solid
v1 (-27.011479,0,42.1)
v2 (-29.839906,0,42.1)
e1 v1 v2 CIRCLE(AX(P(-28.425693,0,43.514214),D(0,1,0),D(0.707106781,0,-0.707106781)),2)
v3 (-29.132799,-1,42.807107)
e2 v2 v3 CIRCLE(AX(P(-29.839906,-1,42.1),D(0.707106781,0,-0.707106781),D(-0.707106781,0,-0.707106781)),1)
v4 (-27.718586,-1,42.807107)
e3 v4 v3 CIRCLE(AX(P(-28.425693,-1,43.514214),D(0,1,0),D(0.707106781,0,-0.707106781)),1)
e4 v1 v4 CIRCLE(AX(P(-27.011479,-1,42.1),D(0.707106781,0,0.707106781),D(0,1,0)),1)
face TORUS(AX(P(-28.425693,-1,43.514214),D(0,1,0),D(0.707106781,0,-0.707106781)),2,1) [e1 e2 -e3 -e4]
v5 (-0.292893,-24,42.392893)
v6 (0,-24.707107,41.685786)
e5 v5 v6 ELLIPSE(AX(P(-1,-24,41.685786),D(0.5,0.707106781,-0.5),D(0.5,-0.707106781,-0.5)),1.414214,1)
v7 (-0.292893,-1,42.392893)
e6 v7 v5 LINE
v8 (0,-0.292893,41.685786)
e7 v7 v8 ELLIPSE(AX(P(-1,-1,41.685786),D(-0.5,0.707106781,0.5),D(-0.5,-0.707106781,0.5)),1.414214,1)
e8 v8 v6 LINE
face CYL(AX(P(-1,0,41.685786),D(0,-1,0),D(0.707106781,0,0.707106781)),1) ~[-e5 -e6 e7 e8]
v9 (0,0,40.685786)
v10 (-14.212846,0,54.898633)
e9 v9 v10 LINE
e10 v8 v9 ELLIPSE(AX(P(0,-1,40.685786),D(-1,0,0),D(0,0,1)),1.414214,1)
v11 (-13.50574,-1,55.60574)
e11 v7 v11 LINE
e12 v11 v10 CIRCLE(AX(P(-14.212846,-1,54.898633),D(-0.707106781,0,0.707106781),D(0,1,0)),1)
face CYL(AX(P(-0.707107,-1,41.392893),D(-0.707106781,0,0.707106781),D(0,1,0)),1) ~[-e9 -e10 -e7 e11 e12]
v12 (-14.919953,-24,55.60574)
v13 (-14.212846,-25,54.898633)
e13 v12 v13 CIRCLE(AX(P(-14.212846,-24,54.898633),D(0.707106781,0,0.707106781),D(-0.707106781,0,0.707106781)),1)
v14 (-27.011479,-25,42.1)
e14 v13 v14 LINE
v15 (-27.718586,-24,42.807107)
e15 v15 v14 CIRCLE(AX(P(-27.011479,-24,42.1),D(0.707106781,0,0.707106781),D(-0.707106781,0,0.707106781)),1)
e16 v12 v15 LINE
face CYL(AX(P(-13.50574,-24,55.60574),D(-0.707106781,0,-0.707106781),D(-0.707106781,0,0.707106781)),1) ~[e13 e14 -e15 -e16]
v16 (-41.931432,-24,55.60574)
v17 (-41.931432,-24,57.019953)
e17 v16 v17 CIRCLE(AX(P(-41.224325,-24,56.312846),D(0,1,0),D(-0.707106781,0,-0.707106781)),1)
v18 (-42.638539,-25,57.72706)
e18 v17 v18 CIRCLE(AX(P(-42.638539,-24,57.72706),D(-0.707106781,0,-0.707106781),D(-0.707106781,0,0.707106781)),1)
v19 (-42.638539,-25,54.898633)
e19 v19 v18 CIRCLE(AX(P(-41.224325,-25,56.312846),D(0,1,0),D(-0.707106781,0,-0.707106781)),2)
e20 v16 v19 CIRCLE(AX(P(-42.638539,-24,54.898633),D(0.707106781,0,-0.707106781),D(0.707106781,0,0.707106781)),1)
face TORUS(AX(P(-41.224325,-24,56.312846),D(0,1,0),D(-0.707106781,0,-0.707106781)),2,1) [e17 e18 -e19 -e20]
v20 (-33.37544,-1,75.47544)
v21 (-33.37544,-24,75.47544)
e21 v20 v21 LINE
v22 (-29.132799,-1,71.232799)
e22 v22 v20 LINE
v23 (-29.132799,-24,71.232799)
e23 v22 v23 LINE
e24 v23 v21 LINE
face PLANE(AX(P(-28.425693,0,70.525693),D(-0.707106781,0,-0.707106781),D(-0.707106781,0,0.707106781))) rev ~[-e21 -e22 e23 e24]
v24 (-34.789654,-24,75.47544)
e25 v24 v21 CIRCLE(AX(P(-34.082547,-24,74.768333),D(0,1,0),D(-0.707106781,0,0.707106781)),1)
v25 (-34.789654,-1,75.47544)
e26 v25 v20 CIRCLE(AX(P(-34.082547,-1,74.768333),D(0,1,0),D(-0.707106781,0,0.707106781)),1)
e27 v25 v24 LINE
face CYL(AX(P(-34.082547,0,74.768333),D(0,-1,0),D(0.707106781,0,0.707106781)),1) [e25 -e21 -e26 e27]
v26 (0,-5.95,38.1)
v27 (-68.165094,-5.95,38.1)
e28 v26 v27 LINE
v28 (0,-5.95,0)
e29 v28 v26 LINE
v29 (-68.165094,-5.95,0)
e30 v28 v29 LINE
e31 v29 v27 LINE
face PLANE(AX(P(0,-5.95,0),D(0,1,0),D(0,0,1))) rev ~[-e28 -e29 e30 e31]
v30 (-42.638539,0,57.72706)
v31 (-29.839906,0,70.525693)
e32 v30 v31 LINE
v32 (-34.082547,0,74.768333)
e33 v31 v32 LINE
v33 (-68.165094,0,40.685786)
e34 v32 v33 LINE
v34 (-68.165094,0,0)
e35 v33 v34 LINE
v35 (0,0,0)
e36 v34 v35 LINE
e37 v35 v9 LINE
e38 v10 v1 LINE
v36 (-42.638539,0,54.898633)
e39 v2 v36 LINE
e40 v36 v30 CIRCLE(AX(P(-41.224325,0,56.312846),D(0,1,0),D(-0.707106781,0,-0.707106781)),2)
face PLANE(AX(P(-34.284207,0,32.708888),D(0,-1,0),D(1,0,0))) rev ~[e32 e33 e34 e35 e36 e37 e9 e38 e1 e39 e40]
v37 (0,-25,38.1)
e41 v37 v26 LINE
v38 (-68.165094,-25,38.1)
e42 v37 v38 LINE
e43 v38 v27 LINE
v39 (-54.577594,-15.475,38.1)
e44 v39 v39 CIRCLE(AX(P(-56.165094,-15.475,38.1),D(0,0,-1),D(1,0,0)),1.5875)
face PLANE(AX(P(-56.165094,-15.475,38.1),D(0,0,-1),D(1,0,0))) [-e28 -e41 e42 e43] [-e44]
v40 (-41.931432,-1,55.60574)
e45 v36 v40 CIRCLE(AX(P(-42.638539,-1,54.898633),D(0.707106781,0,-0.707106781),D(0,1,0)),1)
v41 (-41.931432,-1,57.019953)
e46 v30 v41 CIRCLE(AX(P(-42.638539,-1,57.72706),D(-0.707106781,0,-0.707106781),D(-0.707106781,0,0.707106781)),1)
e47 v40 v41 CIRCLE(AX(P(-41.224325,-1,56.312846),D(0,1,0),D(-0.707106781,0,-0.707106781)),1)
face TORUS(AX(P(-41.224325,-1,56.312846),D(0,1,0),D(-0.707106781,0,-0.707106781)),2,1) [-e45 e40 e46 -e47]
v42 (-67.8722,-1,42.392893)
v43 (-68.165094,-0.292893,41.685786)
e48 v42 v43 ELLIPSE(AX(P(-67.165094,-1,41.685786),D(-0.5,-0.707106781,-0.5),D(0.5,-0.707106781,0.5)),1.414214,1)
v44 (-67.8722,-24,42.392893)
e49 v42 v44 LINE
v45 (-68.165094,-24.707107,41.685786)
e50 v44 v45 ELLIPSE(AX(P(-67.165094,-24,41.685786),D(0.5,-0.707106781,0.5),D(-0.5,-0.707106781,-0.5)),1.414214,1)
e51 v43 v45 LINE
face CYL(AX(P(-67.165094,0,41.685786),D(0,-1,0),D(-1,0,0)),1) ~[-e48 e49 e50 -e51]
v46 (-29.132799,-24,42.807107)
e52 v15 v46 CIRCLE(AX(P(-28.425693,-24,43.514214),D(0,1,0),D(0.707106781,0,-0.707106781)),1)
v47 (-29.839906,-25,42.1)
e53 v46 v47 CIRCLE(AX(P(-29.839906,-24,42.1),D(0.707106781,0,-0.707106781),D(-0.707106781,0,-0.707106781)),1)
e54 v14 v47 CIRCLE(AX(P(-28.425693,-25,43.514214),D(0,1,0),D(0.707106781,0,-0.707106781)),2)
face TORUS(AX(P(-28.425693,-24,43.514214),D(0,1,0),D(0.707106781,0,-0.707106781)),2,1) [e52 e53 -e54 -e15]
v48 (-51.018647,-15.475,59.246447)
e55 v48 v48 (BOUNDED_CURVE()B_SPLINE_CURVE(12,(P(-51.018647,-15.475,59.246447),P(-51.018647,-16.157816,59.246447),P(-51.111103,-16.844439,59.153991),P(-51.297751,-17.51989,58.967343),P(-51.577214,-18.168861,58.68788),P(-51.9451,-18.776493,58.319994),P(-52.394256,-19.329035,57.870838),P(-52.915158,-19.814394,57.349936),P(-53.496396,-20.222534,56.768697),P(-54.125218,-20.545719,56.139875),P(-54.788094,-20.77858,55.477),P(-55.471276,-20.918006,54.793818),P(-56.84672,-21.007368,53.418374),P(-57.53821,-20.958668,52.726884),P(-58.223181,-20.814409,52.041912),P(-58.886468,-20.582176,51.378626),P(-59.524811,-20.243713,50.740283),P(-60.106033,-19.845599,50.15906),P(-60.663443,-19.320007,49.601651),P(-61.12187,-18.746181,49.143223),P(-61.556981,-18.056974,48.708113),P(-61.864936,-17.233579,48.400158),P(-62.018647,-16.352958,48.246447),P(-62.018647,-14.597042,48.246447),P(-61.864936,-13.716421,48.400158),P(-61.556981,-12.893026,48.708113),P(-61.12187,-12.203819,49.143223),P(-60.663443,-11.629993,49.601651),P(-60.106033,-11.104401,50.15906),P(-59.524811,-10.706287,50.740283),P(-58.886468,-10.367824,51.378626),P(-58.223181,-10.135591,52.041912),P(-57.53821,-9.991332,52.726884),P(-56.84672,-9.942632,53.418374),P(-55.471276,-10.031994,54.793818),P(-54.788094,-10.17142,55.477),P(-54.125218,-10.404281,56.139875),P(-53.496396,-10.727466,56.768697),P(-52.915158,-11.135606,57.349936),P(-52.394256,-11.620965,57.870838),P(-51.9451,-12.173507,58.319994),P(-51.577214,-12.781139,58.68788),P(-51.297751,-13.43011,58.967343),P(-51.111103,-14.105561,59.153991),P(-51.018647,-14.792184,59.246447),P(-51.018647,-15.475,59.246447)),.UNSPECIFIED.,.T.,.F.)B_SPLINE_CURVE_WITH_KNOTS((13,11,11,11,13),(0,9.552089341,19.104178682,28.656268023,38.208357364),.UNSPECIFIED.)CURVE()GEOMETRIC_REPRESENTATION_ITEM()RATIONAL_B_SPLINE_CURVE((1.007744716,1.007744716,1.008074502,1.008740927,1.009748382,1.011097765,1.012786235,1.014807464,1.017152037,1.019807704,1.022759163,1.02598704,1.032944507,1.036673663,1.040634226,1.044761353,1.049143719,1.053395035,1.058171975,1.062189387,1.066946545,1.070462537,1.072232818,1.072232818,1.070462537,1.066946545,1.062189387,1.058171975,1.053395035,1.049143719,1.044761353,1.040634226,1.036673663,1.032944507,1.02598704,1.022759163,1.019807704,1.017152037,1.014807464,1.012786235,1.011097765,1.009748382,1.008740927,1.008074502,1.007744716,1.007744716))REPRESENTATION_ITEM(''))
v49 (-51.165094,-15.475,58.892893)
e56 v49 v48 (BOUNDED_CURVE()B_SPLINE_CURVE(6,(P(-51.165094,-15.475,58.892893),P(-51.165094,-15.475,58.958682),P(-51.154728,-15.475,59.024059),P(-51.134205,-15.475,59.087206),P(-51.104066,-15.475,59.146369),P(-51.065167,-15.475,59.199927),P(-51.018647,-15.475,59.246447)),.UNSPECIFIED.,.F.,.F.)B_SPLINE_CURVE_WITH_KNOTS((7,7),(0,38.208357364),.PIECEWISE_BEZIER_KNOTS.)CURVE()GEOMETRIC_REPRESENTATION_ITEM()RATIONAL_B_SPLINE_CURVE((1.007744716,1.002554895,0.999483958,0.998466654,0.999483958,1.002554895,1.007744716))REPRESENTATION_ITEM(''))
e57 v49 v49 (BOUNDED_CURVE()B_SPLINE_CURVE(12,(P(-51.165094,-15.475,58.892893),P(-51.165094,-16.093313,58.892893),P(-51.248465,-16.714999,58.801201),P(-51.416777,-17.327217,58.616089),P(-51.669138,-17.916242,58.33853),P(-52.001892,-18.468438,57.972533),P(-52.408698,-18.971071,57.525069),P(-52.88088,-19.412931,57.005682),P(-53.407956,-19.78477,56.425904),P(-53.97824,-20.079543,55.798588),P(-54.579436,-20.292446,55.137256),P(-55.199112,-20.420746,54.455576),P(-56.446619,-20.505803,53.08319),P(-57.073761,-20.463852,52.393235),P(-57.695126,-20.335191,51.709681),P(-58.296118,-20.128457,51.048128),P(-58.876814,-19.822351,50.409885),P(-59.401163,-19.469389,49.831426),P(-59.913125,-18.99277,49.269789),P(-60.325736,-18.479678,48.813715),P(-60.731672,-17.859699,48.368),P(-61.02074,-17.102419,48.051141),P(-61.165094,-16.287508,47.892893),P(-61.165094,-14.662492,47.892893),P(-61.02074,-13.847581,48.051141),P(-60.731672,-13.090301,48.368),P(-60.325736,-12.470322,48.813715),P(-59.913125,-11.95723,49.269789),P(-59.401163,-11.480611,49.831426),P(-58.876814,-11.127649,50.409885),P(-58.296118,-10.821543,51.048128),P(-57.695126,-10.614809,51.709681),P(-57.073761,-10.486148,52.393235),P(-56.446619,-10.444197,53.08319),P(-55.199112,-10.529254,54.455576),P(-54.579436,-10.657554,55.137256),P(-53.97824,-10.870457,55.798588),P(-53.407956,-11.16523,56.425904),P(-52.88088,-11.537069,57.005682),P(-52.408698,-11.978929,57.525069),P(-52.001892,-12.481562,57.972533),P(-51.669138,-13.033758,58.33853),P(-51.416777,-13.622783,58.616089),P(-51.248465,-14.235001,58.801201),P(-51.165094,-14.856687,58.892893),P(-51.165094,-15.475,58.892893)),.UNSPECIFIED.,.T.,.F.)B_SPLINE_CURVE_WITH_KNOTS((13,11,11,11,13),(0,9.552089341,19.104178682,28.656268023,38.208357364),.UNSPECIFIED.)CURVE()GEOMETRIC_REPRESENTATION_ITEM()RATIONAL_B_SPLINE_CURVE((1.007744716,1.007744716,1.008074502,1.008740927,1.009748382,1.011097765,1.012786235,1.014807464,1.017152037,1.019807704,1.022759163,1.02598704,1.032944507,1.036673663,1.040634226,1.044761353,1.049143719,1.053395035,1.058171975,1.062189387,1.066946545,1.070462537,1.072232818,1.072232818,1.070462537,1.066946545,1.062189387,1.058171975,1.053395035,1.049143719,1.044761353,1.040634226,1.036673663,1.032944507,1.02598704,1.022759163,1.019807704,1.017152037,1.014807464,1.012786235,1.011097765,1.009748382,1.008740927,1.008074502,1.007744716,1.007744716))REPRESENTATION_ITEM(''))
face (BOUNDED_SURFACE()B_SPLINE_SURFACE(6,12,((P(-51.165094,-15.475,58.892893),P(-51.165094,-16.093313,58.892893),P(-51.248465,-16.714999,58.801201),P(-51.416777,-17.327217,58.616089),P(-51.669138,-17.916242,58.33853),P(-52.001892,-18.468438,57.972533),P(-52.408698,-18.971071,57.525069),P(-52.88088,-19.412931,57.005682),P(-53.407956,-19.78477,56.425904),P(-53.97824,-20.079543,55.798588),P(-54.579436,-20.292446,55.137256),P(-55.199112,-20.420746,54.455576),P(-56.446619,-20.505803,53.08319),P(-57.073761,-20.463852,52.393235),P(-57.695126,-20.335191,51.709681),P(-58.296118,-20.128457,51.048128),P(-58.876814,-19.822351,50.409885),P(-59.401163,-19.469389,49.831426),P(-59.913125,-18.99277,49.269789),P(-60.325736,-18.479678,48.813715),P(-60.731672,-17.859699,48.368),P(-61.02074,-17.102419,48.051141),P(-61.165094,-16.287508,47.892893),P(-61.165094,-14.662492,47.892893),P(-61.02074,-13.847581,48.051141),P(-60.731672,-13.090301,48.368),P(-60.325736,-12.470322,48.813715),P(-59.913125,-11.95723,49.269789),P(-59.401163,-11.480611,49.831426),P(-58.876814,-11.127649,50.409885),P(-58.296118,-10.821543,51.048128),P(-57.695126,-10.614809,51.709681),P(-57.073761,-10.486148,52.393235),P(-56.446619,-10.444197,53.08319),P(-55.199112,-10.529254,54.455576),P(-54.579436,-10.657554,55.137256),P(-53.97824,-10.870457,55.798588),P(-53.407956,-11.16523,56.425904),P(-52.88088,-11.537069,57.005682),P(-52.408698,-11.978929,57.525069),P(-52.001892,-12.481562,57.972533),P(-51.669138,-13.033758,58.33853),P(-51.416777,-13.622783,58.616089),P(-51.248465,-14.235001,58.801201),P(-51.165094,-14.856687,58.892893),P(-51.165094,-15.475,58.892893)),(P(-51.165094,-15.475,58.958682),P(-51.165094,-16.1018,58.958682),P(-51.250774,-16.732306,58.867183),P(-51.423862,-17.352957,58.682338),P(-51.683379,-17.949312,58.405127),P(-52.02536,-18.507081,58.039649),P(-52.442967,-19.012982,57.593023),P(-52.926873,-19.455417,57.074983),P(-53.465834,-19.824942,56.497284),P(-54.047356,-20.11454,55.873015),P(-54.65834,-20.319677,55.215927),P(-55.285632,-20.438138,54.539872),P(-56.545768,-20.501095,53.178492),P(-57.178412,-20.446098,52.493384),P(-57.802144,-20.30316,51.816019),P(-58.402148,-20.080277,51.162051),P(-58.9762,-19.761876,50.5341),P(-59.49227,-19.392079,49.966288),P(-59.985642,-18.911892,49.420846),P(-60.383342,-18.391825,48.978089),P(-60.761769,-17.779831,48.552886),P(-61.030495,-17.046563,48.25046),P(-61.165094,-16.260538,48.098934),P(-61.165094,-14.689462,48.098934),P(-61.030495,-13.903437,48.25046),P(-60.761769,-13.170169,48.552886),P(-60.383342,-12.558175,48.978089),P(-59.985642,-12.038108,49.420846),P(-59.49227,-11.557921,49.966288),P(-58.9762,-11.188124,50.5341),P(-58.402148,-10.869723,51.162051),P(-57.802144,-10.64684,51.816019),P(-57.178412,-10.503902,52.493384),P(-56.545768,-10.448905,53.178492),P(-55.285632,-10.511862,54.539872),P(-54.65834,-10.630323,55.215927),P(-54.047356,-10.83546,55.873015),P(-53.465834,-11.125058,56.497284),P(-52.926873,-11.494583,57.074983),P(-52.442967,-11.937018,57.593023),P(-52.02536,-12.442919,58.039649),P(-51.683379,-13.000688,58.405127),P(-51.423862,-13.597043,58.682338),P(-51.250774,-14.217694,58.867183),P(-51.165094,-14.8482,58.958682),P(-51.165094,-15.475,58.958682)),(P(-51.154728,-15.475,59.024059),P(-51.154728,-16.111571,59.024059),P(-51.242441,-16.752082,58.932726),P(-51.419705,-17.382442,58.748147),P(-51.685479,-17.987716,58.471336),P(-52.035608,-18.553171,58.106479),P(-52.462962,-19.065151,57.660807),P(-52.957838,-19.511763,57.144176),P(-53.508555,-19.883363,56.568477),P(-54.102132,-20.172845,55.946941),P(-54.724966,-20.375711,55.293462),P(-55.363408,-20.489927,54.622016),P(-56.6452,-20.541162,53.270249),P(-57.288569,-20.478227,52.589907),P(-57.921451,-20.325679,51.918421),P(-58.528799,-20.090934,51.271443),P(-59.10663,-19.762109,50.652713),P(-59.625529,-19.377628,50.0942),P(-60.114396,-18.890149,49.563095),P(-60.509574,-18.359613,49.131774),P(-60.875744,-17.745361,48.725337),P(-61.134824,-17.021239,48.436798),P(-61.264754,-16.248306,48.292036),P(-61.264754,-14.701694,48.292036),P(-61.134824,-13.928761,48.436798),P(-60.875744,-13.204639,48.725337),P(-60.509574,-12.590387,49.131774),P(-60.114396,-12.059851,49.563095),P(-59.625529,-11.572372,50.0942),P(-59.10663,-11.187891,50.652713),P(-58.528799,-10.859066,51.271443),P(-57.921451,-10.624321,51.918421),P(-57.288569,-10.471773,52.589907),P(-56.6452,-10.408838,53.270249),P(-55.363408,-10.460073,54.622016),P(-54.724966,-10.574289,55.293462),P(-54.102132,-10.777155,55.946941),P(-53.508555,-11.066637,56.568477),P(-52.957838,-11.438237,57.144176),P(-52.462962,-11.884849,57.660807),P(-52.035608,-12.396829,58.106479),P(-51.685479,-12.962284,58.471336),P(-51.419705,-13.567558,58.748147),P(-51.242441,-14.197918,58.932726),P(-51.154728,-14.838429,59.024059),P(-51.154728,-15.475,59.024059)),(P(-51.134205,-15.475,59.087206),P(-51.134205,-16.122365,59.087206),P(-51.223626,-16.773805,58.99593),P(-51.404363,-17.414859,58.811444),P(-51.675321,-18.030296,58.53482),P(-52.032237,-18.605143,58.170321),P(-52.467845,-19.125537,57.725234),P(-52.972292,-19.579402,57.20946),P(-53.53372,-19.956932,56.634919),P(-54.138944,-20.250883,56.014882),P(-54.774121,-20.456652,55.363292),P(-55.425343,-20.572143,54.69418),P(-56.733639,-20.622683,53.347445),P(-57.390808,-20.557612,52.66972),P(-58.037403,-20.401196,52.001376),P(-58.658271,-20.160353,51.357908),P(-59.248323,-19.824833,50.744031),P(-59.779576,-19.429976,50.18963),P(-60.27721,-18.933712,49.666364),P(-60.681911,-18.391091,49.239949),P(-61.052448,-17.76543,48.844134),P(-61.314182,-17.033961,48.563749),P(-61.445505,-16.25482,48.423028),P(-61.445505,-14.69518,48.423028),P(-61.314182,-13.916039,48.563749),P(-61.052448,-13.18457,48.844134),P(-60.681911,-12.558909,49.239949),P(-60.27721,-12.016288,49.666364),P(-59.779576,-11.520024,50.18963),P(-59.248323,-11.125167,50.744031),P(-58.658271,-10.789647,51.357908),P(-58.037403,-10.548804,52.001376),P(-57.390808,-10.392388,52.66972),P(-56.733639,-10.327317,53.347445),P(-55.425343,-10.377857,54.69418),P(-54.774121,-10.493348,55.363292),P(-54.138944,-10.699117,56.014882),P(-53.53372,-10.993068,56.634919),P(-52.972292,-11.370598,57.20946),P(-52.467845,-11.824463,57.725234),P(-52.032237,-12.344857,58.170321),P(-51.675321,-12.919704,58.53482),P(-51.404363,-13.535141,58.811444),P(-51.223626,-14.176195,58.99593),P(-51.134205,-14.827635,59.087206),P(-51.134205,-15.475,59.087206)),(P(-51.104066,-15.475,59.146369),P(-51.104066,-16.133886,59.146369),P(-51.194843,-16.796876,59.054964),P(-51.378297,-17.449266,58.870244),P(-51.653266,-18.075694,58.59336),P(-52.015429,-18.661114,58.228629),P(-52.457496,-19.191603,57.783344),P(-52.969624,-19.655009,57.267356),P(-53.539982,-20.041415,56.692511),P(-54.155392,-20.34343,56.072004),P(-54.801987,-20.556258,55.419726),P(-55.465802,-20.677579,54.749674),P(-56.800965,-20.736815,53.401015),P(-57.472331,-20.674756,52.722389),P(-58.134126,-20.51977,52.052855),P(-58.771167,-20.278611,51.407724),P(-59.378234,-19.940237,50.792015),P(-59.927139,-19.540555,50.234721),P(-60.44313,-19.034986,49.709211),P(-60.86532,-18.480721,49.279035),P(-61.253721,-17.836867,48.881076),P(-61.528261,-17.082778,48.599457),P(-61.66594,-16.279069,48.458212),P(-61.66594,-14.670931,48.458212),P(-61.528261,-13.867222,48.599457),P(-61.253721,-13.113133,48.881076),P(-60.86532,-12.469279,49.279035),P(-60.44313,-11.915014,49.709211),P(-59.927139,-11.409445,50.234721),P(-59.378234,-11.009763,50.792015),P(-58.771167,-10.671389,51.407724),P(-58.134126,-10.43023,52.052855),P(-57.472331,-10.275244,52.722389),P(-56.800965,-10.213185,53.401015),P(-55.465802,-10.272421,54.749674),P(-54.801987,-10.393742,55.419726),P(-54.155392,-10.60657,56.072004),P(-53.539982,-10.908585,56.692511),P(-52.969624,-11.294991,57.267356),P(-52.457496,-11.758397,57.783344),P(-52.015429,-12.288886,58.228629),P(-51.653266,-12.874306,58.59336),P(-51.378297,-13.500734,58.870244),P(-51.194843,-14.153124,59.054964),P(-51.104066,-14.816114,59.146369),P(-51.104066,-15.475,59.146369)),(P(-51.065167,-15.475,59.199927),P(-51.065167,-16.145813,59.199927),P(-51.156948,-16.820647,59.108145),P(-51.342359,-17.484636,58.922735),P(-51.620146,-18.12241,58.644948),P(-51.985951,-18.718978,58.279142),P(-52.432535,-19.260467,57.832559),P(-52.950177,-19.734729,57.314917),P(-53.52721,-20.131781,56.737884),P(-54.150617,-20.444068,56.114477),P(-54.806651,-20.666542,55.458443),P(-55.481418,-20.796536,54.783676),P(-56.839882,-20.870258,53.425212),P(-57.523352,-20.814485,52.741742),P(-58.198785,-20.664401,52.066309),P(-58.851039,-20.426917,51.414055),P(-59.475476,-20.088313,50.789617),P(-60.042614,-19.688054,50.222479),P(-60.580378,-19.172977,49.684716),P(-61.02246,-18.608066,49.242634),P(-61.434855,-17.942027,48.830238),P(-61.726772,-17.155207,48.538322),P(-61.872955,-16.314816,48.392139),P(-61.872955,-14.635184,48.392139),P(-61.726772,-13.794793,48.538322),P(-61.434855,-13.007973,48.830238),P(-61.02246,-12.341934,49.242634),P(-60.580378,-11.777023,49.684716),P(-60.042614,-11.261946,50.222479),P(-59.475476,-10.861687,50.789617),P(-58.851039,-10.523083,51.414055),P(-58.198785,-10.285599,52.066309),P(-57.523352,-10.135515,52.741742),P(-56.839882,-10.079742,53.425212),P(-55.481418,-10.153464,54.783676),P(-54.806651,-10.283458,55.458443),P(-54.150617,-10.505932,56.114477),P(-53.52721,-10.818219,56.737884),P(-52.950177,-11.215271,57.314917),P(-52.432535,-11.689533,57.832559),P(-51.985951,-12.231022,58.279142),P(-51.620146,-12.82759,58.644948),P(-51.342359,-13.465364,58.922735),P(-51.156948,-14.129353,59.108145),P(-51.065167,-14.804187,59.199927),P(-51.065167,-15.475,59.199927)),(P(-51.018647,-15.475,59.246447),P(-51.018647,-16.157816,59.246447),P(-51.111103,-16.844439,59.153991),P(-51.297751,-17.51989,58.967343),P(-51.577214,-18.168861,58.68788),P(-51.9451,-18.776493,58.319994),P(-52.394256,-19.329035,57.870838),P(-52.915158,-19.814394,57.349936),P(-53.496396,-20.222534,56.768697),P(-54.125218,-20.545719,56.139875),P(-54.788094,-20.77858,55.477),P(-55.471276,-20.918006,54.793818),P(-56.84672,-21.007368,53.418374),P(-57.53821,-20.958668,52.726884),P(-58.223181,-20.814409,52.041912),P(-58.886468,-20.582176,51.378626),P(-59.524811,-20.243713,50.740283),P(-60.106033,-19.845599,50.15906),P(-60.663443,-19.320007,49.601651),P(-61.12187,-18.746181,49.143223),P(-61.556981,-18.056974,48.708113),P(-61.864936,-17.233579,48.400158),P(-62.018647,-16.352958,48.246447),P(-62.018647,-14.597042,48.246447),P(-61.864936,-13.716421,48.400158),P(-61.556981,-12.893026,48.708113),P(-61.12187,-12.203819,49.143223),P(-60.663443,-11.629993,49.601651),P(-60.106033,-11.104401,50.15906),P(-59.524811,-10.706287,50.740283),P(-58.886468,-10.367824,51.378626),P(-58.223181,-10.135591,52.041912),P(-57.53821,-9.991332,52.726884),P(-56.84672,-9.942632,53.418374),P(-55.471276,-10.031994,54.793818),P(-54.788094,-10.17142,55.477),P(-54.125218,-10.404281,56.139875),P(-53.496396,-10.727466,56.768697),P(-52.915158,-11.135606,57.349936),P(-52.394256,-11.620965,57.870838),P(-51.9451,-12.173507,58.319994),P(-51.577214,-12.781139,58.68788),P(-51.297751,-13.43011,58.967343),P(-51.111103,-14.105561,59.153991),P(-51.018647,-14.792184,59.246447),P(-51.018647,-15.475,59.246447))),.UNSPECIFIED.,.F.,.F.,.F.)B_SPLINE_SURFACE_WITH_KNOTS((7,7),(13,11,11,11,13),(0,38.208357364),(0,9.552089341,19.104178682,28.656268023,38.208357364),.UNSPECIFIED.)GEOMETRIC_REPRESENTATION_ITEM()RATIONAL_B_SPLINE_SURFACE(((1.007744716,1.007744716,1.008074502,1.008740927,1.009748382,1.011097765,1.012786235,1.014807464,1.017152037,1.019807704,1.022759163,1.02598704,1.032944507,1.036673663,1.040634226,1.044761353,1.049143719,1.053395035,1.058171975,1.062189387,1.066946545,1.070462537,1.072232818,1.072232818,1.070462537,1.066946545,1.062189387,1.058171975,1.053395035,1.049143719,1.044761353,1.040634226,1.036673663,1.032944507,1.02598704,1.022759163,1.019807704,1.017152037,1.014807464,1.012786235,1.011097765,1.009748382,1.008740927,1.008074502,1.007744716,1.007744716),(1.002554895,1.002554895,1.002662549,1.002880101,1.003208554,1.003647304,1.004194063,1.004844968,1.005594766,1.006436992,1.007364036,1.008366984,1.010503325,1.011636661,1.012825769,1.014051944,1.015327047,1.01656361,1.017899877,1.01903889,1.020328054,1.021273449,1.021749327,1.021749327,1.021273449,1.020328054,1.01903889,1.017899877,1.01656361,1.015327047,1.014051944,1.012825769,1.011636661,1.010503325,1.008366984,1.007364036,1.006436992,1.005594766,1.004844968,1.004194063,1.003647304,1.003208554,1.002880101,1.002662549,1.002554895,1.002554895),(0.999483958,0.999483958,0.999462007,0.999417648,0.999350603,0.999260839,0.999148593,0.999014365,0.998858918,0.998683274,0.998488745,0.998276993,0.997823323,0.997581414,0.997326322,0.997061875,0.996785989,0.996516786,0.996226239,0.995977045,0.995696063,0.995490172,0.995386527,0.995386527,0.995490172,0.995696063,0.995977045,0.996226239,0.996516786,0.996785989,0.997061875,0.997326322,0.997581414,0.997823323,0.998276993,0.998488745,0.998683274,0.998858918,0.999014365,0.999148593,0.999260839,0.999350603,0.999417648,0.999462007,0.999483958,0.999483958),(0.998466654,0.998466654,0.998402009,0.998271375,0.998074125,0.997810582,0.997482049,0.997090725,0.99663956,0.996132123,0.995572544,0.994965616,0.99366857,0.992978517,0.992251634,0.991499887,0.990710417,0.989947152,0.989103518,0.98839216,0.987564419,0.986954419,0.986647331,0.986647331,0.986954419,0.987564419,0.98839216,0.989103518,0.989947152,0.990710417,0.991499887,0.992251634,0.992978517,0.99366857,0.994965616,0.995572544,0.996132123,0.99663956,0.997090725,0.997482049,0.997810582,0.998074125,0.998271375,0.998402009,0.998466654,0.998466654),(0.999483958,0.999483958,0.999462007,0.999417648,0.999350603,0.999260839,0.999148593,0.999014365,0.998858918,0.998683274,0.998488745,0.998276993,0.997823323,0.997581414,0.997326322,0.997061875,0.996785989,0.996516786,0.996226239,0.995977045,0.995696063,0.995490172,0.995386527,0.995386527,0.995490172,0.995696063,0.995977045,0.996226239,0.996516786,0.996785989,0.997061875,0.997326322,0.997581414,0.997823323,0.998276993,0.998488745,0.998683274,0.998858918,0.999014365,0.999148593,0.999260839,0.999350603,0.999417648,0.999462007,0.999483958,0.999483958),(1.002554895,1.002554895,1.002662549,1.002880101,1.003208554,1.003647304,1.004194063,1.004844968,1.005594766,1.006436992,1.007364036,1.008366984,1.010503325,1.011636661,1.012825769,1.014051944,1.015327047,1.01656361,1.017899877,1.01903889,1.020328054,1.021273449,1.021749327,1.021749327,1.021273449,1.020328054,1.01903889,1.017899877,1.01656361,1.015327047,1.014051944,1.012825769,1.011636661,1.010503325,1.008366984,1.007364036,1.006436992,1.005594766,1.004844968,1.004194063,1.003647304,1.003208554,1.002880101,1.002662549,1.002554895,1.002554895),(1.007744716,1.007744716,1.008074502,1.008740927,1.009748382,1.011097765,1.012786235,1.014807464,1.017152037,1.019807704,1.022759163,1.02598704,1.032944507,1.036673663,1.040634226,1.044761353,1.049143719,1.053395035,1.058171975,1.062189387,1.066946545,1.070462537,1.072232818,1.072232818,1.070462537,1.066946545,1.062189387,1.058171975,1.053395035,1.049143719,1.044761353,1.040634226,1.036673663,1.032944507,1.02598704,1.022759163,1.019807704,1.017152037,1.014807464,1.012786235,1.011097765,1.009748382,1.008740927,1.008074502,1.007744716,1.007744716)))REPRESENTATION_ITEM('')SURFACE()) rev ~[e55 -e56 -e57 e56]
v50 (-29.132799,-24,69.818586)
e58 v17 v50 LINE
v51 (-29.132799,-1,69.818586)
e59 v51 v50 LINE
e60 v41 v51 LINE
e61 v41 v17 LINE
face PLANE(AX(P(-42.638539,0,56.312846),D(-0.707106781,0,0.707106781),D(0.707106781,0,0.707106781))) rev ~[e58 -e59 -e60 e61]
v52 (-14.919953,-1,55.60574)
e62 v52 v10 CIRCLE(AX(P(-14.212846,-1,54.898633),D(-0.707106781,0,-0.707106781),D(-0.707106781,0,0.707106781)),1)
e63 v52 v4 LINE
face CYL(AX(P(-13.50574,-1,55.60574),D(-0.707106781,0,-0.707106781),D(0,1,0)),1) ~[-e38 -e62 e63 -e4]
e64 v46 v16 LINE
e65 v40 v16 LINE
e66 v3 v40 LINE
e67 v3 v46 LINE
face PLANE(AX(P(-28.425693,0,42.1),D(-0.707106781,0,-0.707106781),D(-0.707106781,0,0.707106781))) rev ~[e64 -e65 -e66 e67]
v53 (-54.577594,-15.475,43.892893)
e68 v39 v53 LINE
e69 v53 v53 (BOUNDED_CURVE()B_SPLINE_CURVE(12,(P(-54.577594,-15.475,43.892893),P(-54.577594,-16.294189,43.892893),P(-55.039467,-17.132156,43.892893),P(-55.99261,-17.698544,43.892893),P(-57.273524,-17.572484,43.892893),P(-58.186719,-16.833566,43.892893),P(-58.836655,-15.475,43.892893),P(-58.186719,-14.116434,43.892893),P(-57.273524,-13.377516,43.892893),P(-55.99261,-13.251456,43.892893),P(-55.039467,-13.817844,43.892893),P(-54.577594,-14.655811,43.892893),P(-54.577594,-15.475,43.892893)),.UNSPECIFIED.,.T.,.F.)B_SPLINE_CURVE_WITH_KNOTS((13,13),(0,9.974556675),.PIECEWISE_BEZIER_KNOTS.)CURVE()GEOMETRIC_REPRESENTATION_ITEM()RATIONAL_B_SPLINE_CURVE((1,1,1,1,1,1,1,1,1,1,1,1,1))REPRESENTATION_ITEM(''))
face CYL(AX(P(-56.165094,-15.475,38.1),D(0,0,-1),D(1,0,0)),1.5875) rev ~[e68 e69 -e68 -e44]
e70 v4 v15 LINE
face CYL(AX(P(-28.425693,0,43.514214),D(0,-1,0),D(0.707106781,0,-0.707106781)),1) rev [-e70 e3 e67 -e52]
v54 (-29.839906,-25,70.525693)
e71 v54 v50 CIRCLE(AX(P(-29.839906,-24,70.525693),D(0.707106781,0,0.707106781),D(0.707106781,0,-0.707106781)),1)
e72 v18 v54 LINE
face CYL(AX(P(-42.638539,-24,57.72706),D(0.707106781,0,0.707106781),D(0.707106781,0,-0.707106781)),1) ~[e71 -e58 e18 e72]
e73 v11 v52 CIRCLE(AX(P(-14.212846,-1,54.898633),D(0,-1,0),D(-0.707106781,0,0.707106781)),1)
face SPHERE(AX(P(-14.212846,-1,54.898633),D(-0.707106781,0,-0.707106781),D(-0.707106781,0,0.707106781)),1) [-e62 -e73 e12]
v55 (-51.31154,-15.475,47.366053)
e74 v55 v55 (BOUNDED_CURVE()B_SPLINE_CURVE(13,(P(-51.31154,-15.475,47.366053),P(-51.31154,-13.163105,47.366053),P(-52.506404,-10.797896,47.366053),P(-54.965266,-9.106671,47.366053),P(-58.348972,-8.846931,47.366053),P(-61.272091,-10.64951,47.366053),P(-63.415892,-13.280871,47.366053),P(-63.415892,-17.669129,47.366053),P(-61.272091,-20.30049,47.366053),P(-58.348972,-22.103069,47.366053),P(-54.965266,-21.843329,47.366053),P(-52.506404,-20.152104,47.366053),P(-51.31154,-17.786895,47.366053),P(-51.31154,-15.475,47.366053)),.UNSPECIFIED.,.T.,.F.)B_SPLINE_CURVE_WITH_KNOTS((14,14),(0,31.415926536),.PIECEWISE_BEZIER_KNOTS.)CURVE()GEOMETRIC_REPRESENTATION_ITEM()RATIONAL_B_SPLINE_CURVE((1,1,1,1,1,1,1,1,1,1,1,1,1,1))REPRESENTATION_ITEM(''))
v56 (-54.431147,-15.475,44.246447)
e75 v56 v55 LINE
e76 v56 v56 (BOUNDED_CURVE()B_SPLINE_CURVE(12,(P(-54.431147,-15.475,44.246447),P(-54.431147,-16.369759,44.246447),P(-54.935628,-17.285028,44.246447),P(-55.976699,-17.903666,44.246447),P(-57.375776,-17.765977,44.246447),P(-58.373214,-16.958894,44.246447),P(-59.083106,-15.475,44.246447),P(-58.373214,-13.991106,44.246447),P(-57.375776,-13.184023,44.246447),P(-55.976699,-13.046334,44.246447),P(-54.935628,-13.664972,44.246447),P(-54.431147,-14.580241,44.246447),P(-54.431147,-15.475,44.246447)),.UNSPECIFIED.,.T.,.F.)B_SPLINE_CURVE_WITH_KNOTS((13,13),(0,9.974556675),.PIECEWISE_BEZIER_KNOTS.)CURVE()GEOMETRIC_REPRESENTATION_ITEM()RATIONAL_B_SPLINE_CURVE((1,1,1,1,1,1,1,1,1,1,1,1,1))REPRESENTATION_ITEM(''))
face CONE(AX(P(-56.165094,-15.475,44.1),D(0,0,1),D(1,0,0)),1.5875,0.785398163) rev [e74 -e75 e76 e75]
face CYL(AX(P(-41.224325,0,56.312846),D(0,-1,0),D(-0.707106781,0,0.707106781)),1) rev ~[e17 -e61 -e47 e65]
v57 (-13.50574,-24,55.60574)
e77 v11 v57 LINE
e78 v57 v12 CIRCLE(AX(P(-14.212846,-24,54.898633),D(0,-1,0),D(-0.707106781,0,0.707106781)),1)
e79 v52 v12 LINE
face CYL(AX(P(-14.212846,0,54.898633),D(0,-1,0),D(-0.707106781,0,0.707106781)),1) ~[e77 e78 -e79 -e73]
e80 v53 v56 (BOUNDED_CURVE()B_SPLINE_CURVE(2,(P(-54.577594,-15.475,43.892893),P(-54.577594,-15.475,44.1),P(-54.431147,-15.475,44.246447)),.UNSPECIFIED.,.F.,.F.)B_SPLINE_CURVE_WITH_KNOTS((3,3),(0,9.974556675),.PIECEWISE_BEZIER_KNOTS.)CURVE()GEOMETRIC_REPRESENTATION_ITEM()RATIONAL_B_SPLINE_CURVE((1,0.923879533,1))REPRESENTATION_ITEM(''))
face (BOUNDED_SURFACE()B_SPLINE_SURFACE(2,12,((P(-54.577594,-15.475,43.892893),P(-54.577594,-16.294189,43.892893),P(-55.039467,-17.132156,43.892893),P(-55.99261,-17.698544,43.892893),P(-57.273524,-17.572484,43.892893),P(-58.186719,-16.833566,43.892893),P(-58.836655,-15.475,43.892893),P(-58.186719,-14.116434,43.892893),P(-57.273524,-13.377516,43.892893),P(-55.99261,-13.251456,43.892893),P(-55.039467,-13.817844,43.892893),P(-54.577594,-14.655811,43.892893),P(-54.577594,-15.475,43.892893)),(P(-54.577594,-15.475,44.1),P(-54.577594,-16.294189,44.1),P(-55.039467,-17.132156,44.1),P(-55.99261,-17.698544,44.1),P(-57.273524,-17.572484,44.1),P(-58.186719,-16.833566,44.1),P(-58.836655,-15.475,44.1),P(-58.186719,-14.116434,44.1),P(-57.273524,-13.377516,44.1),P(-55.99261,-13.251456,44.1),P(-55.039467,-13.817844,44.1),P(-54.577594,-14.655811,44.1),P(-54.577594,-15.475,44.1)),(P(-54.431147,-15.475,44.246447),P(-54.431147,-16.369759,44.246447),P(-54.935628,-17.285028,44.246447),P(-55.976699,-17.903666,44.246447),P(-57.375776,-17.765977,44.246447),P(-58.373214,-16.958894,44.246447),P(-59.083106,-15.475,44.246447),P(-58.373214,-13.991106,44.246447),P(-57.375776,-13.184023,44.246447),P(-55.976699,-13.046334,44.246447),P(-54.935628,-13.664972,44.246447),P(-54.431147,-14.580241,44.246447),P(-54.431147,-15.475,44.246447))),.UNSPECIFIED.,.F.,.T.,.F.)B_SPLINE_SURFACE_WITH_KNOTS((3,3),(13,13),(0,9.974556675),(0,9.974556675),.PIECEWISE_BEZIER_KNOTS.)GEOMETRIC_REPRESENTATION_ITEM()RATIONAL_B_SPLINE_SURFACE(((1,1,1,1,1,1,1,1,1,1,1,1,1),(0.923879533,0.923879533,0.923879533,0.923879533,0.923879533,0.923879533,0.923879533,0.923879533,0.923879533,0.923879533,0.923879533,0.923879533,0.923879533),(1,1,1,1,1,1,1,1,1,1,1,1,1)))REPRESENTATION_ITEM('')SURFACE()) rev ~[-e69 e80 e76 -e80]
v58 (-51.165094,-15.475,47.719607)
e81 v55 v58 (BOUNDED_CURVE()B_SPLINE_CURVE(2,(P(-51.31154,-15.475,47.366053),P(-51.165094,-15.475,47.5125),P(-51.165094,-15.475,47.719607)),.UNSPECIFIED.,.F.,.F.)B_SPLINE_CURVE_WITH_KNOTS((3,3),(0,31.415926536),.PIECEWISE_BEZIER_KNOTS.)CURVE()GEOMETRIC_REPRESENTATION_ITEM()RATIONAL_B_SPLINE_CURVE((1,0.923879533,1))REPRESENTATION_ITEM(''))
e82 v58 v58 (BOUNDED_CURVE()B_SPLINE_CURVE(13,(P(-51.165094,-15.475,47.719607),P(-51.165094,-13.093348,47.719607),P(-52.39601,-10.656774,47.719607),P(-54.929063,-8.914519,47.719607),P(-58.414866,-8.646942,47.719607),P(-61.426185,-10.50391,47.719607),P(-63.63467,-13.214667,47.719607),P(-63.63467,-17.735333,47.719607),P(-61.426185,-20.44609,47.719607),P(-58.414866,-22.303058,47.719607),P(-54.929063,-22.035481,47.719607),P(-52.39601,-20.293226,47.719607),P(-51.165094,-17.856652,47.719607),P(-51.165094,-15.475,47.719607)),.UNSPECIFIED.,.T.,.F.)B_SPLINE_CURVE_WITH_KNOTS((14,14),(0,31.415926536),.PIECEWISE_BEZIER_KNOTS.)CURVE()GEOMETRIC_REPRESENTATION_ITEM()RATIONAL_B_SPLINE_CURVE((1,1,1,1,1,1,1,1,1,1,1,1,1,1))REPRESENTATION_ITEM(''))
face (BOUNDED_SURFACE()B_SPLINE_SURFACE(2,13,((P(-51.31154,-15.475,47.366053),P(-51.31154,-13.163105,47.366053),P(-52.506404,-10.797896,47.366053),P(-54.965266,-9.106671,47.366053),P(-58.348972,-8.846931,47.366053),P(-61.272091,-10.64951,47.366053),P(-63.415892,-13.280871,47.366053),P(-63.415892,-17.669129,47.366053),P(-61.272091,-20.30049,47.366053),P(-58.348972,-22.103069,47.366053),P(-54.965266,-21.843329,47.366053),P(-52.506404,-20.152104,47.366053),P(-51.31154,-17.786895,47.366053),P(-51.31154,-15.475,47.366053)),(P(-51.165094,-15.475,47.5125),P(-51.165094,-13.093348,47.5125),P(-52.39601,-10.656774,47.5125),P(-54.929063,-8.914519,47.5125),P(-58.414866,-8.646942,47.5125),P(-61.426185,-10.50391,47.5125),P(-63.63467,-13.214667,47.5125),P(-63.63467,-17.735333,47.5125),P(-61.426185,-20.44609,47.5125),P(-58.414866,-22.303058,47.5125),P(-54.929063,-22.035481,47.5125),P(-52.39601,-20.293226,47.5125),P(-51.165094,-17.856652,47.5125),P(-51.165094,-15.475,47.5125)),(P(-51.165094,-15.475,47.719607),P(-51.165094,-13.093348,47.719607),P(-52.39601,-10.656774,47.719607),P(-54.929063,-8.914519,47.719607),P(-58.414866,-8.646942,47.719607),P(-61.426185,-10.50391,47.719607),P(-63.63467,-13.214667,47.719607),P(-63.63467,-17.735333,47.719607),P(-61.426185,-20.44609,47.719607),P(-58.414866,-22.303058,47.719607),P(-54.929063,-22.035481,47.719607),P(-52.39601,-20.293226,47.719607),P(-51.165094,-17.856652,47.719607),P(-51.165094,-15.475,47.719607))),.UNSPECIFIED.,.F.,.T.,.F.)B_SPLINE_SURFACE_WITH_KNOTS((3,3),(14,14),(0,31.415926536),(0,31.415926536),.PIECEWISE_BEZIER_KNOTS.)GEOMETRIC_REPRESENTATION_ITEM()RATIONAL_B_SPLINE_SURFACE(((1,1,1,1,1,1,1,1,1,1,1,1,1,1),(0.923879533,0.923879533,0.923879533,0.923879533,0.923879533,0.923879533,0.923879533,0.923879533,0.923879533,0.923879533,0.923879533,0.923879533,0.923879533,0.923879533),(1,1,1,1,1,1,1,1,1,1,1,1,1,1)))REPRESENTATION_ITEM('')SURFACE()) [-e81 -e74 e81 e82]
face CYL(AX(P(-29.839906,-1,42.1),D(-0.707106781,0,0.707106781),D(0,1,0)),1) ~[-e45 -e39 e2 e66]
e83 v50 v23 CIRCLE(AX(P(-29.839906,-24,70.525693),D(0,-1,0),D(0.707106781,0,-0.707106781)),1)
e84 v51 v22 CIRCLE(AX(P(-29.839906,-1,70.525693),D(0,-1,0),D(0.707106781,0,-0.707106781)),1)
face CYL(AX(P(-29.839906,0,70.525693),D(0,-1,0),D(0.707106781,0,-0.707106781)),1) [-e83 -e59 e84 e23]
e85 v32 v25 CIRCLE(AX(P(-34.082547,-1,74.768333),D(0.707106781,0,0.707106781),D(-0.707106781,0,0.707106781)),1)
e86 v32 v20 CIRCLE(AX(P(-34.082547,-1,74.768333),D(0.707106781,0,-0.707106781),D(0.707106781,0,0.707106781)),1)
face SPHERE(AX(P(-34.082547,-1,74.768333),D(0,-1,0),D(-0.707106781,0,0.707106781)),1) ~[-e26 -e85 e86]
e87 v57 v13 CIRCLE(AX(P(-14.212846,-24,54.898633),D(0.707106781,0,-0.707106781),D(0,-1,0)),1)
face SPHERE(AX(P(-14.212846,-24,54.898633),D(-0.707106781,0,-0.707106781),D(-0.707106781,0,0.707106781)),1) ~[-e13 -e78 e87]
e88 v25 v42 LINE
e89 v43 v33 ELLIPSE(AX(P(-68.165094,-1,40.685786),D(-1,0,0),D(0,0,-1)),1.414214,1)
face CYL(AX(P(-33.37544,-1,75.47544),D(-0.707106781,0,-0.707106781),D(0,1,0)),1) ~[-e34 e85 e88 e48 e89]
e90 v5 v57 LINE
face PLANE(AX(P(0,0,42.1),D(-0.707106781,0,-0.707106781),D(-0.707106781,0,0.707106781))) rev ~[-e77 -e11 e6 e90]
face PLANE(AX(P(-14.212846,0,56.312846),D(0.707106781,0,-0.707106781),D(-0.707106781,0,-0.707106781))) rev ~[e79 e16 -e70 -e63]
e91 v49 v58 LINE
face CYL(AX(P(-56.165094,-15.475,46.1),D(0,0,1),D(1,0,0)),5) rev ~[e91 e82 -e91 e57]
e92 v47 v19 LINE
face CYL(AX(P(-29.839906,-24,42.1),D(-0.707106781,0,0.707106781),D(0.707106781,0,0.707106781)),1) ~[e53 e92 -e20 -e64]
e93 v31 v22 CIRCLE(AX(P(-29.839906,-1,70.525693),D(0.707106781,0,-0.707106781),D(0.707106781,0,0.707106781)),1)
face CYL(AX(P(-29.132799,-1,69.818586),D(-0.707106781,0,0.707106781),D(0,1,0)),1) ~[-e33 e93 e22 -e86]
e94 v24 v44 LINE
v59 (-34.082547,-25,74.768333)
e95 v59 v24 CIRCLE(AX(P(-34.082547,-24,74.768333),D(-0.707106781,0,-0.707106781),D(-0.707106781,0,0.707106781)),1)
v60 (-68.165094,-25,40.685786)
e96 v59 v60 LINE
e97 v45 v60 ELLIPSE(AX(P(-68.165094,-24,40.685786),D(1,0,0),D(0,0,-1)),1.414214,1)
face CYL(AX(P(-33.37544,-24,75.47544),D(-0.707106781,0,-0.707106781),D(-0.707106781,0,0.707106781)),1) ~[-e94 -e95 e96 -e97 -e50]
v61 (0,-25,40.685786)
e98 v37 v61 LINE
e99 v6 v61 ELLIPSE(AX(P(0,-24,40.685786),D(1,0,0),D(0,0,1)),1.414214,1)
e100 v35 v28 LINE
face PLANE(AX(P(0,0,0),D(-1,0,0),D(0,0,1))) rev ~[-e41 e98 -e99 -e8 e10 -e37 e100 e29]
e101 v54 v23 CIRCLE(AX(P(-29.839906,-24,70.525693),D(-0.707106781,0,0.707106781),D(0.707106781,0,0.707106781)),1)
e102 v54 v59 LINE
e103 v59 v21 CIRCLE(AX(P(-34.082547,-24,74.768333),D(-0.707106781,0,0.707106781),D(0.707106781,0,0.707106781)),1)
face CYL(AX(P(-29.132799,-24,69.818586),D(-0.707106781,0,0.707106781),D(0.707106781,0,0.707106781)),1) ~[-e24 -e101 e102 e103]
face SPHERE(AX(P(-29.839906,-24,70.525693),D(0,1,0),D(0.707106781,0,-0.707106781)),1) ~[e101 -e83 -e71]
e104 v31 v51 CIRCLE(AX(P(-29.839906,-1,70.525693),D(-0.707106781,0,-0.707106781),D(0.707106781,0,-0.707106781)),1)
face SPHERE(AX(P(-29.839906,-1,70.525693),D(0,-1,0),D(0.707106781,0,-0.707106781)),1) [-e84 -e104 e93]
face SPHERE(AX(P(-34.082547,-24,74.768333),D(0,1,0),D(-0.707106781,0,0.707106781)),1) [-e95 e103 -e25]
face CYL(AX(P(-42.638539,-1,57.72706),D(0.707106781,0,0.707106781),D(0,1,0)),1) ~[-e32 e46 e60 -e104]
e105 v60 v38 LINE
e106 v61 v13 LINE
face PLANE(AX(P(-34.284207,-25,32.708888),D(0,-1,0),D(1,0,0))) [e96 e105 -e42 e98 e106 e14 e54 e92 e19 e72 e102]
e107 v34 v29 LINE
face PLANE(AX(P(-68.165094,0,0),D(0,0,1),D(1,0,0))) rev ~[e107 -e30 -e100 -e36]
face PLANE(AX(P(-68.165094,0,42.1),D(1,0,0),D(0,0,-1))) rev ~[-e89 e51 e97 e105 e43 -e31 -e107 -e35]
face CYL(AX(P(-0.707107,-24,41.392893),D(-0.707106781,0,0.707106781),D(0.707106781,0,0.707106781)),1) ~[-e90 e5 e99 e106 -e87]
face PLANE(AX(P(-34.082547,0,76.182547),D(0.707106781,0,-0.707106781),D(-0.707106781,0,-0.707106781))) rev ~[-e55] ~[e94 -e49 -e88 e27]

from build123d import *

# Parameters (mm, degrees)
F1_DEPTH    = 25
F2_W        = 19.05
F2_H        = 38.1
F3_DEPTH    = 68.1660937064
F4_F1_R     = 1
F4_F2_R     = 1
F5_R        = 5
F5_R_2      = 1.5875
F6_DEPTH    = 37.6693332908
F7_DEPTH    = 10
F8_S5_R     = 5
F8_T6_DEPTH = 10
F9_R        = 0.5


# Not quite as in the source:
# - a fillet or chamfer that OpenCascade refuses, or shapes differently, is made with other operations: its cross-section is extruded or revolved along the edge and cut away or added


with BuildPart() as f1:
    # F0 (on Front) → F1 (new body)
    with BuildSketch(Plane.XZ):
        Polygon((-34.0825468532, 76.1825468532), (-68.1650937064, 42.1), (-68.1650937064, 0), (0, 0), (0, 42.1), (-14.2128463018, 56.3128463018), (-28.4256926037, 42.1), (-42.6385389055, 56.3128463018), (-28.4256926037, 70.5256926037), align=None)
    extrude(amount=F1_DEPTH)

    # F2 (on face) → F3 (cut, through all)
    with BuildSketch(Plane.YZ):
        with Locations((-15.475, 19.05)):
            Rectangle(F2_W, F2_H)
    extrude(amount=-F3_DEPTH, mode=Mode.SUBTRACT)

    # F4: fillet of radius 1 on 17 edges, made by hand

    # F4_f1
    f4_f1_edges = [f1.edges().sort_by_distance(p)[0] for p in [
        (-42.6385389055, -12.5, 56.3128463018),
        (-28.4256926037, -12.5, 42.1),
    ]]
    fillet(f4_f1_edges, radius=F4_F1_R)

    # F4_f2
    f4_f2_edges = [f1.edges().sort_by_distance(p)[0] for p in [
        (-28.4256926037, -12.5, 70.5256926037),
        (-35.178562364, 0, 63.7728228434),
        (-35.178562364, -25, 63.7728228434),
        (-14.2128463018, -12.5, 56.3128463018),
        (-20.9657160622, 0, 49.5599765415),
        (-20.9657160622, -25, 49.5599765415),
        (-34.0825468532, -12.5, 76.1825468532),
        (-68.1650937064, -12.5, 42.1),
        (-51.1238202798, 0, 59.1412734266),
        (-51.1238202798, -25, 59.1412734266),
        (0, -12.5, 42.1),
        (-7.1064231509, 0, 49.2064231509),
        (-7.1064231509, -25, 49.2064231509),
        (-31.2541197284, 0, 73.3541197284),
        (-31.2541197284, -25, 73.3541197284),
        (-28.4256926037, -25, 42.5142135624),
        (-28.4256926037, 0, 42.5142135624),
        (-42.2243253432, -25, 56.3128463018),
        (-42.2243253432, 0, 56.3128463018),
    ]]
    fillet(f4_f2_edges, radius=F4_F2_R)

    # F5 (on face) → F6 (cut, through all)
    with BuildSketch(Plane(origin=(0, 0, 38.1), x_dir=(1, 0, 0), z_dir=(0, 0, -1))):
        with Locations((-56.1650937064, 15.475)):
            Circle(F5_R)
        with Locations((-56.1650937064, 15.475)):
            Circle(F5_R_2, mode=Mode.SUBTRACT)
        with Locations((-56.1650937064, 15.475)):
            Circle(F5_R_2)
    extrude(amount=-F6_DEPTH, mode=Mode.SUBTRACT)

    # F5 (on face) → F7 (join)
    with BuildSketch(Plane(origin=(0, 0, 38.1), x_dir=(1, 0, 0), z_dir=(0, 0, -1))):
        with Locations((-56.1650937064, 15.475)):
            Circle(F5_R)
        with Locations((-56.1650937064, 15.475)):
            Circle(F5_R_2, mode=Mode.SUBTRACT)
    extrude(amount=-F7_DEPTH)

    # F8: chamfer of 4 on 1 edges, made by hand


with BuildPart() as f8_tool2:
    # F8_s3 → F8_t4 (revolve)
    with BuildSketch(Plane.XZ.offset(15.475)):
        Polygon((-54.5775937064, 44.1), (-50.5775937064, 48.1), (-54.5775937064, 48.1), align=None)
    revolve(axis=Axis((-56.1650937064, -15.475, 48.1), (0, 0, -1)))

    # F8_s5 → F8_t6 (intersect, symmetric)
    with BuildSketch(Plane.XY.offset(46.1)):
        with Locations((-56.1650937064, -15.475)):
            Circle(F8_S5_R)
    extrude(amount=F8_T6_DEPTH, both=True, mode=Mode.INTERSECT)


with BuildPart() as f1_1:
    add(f1.part)

    # F8_t1: cut F8_tool2
    add(f8_tool2.part, mode=Mode.SUBTRACT)

    # F9
    f9_edges = [f1_1.edges().sort_by_distance(p)[0] for p in [
        (-61.165093, -15.47181, 49.100001),
        (-51.165094, -15.475, 53.30625),
        (-61.165094, -15.475, 47.5125),
        (-57.752594, -15.475, 44.1),
    ]]
    fillet(f9_edges, radius=F9_R)


solid = f1_1.part
